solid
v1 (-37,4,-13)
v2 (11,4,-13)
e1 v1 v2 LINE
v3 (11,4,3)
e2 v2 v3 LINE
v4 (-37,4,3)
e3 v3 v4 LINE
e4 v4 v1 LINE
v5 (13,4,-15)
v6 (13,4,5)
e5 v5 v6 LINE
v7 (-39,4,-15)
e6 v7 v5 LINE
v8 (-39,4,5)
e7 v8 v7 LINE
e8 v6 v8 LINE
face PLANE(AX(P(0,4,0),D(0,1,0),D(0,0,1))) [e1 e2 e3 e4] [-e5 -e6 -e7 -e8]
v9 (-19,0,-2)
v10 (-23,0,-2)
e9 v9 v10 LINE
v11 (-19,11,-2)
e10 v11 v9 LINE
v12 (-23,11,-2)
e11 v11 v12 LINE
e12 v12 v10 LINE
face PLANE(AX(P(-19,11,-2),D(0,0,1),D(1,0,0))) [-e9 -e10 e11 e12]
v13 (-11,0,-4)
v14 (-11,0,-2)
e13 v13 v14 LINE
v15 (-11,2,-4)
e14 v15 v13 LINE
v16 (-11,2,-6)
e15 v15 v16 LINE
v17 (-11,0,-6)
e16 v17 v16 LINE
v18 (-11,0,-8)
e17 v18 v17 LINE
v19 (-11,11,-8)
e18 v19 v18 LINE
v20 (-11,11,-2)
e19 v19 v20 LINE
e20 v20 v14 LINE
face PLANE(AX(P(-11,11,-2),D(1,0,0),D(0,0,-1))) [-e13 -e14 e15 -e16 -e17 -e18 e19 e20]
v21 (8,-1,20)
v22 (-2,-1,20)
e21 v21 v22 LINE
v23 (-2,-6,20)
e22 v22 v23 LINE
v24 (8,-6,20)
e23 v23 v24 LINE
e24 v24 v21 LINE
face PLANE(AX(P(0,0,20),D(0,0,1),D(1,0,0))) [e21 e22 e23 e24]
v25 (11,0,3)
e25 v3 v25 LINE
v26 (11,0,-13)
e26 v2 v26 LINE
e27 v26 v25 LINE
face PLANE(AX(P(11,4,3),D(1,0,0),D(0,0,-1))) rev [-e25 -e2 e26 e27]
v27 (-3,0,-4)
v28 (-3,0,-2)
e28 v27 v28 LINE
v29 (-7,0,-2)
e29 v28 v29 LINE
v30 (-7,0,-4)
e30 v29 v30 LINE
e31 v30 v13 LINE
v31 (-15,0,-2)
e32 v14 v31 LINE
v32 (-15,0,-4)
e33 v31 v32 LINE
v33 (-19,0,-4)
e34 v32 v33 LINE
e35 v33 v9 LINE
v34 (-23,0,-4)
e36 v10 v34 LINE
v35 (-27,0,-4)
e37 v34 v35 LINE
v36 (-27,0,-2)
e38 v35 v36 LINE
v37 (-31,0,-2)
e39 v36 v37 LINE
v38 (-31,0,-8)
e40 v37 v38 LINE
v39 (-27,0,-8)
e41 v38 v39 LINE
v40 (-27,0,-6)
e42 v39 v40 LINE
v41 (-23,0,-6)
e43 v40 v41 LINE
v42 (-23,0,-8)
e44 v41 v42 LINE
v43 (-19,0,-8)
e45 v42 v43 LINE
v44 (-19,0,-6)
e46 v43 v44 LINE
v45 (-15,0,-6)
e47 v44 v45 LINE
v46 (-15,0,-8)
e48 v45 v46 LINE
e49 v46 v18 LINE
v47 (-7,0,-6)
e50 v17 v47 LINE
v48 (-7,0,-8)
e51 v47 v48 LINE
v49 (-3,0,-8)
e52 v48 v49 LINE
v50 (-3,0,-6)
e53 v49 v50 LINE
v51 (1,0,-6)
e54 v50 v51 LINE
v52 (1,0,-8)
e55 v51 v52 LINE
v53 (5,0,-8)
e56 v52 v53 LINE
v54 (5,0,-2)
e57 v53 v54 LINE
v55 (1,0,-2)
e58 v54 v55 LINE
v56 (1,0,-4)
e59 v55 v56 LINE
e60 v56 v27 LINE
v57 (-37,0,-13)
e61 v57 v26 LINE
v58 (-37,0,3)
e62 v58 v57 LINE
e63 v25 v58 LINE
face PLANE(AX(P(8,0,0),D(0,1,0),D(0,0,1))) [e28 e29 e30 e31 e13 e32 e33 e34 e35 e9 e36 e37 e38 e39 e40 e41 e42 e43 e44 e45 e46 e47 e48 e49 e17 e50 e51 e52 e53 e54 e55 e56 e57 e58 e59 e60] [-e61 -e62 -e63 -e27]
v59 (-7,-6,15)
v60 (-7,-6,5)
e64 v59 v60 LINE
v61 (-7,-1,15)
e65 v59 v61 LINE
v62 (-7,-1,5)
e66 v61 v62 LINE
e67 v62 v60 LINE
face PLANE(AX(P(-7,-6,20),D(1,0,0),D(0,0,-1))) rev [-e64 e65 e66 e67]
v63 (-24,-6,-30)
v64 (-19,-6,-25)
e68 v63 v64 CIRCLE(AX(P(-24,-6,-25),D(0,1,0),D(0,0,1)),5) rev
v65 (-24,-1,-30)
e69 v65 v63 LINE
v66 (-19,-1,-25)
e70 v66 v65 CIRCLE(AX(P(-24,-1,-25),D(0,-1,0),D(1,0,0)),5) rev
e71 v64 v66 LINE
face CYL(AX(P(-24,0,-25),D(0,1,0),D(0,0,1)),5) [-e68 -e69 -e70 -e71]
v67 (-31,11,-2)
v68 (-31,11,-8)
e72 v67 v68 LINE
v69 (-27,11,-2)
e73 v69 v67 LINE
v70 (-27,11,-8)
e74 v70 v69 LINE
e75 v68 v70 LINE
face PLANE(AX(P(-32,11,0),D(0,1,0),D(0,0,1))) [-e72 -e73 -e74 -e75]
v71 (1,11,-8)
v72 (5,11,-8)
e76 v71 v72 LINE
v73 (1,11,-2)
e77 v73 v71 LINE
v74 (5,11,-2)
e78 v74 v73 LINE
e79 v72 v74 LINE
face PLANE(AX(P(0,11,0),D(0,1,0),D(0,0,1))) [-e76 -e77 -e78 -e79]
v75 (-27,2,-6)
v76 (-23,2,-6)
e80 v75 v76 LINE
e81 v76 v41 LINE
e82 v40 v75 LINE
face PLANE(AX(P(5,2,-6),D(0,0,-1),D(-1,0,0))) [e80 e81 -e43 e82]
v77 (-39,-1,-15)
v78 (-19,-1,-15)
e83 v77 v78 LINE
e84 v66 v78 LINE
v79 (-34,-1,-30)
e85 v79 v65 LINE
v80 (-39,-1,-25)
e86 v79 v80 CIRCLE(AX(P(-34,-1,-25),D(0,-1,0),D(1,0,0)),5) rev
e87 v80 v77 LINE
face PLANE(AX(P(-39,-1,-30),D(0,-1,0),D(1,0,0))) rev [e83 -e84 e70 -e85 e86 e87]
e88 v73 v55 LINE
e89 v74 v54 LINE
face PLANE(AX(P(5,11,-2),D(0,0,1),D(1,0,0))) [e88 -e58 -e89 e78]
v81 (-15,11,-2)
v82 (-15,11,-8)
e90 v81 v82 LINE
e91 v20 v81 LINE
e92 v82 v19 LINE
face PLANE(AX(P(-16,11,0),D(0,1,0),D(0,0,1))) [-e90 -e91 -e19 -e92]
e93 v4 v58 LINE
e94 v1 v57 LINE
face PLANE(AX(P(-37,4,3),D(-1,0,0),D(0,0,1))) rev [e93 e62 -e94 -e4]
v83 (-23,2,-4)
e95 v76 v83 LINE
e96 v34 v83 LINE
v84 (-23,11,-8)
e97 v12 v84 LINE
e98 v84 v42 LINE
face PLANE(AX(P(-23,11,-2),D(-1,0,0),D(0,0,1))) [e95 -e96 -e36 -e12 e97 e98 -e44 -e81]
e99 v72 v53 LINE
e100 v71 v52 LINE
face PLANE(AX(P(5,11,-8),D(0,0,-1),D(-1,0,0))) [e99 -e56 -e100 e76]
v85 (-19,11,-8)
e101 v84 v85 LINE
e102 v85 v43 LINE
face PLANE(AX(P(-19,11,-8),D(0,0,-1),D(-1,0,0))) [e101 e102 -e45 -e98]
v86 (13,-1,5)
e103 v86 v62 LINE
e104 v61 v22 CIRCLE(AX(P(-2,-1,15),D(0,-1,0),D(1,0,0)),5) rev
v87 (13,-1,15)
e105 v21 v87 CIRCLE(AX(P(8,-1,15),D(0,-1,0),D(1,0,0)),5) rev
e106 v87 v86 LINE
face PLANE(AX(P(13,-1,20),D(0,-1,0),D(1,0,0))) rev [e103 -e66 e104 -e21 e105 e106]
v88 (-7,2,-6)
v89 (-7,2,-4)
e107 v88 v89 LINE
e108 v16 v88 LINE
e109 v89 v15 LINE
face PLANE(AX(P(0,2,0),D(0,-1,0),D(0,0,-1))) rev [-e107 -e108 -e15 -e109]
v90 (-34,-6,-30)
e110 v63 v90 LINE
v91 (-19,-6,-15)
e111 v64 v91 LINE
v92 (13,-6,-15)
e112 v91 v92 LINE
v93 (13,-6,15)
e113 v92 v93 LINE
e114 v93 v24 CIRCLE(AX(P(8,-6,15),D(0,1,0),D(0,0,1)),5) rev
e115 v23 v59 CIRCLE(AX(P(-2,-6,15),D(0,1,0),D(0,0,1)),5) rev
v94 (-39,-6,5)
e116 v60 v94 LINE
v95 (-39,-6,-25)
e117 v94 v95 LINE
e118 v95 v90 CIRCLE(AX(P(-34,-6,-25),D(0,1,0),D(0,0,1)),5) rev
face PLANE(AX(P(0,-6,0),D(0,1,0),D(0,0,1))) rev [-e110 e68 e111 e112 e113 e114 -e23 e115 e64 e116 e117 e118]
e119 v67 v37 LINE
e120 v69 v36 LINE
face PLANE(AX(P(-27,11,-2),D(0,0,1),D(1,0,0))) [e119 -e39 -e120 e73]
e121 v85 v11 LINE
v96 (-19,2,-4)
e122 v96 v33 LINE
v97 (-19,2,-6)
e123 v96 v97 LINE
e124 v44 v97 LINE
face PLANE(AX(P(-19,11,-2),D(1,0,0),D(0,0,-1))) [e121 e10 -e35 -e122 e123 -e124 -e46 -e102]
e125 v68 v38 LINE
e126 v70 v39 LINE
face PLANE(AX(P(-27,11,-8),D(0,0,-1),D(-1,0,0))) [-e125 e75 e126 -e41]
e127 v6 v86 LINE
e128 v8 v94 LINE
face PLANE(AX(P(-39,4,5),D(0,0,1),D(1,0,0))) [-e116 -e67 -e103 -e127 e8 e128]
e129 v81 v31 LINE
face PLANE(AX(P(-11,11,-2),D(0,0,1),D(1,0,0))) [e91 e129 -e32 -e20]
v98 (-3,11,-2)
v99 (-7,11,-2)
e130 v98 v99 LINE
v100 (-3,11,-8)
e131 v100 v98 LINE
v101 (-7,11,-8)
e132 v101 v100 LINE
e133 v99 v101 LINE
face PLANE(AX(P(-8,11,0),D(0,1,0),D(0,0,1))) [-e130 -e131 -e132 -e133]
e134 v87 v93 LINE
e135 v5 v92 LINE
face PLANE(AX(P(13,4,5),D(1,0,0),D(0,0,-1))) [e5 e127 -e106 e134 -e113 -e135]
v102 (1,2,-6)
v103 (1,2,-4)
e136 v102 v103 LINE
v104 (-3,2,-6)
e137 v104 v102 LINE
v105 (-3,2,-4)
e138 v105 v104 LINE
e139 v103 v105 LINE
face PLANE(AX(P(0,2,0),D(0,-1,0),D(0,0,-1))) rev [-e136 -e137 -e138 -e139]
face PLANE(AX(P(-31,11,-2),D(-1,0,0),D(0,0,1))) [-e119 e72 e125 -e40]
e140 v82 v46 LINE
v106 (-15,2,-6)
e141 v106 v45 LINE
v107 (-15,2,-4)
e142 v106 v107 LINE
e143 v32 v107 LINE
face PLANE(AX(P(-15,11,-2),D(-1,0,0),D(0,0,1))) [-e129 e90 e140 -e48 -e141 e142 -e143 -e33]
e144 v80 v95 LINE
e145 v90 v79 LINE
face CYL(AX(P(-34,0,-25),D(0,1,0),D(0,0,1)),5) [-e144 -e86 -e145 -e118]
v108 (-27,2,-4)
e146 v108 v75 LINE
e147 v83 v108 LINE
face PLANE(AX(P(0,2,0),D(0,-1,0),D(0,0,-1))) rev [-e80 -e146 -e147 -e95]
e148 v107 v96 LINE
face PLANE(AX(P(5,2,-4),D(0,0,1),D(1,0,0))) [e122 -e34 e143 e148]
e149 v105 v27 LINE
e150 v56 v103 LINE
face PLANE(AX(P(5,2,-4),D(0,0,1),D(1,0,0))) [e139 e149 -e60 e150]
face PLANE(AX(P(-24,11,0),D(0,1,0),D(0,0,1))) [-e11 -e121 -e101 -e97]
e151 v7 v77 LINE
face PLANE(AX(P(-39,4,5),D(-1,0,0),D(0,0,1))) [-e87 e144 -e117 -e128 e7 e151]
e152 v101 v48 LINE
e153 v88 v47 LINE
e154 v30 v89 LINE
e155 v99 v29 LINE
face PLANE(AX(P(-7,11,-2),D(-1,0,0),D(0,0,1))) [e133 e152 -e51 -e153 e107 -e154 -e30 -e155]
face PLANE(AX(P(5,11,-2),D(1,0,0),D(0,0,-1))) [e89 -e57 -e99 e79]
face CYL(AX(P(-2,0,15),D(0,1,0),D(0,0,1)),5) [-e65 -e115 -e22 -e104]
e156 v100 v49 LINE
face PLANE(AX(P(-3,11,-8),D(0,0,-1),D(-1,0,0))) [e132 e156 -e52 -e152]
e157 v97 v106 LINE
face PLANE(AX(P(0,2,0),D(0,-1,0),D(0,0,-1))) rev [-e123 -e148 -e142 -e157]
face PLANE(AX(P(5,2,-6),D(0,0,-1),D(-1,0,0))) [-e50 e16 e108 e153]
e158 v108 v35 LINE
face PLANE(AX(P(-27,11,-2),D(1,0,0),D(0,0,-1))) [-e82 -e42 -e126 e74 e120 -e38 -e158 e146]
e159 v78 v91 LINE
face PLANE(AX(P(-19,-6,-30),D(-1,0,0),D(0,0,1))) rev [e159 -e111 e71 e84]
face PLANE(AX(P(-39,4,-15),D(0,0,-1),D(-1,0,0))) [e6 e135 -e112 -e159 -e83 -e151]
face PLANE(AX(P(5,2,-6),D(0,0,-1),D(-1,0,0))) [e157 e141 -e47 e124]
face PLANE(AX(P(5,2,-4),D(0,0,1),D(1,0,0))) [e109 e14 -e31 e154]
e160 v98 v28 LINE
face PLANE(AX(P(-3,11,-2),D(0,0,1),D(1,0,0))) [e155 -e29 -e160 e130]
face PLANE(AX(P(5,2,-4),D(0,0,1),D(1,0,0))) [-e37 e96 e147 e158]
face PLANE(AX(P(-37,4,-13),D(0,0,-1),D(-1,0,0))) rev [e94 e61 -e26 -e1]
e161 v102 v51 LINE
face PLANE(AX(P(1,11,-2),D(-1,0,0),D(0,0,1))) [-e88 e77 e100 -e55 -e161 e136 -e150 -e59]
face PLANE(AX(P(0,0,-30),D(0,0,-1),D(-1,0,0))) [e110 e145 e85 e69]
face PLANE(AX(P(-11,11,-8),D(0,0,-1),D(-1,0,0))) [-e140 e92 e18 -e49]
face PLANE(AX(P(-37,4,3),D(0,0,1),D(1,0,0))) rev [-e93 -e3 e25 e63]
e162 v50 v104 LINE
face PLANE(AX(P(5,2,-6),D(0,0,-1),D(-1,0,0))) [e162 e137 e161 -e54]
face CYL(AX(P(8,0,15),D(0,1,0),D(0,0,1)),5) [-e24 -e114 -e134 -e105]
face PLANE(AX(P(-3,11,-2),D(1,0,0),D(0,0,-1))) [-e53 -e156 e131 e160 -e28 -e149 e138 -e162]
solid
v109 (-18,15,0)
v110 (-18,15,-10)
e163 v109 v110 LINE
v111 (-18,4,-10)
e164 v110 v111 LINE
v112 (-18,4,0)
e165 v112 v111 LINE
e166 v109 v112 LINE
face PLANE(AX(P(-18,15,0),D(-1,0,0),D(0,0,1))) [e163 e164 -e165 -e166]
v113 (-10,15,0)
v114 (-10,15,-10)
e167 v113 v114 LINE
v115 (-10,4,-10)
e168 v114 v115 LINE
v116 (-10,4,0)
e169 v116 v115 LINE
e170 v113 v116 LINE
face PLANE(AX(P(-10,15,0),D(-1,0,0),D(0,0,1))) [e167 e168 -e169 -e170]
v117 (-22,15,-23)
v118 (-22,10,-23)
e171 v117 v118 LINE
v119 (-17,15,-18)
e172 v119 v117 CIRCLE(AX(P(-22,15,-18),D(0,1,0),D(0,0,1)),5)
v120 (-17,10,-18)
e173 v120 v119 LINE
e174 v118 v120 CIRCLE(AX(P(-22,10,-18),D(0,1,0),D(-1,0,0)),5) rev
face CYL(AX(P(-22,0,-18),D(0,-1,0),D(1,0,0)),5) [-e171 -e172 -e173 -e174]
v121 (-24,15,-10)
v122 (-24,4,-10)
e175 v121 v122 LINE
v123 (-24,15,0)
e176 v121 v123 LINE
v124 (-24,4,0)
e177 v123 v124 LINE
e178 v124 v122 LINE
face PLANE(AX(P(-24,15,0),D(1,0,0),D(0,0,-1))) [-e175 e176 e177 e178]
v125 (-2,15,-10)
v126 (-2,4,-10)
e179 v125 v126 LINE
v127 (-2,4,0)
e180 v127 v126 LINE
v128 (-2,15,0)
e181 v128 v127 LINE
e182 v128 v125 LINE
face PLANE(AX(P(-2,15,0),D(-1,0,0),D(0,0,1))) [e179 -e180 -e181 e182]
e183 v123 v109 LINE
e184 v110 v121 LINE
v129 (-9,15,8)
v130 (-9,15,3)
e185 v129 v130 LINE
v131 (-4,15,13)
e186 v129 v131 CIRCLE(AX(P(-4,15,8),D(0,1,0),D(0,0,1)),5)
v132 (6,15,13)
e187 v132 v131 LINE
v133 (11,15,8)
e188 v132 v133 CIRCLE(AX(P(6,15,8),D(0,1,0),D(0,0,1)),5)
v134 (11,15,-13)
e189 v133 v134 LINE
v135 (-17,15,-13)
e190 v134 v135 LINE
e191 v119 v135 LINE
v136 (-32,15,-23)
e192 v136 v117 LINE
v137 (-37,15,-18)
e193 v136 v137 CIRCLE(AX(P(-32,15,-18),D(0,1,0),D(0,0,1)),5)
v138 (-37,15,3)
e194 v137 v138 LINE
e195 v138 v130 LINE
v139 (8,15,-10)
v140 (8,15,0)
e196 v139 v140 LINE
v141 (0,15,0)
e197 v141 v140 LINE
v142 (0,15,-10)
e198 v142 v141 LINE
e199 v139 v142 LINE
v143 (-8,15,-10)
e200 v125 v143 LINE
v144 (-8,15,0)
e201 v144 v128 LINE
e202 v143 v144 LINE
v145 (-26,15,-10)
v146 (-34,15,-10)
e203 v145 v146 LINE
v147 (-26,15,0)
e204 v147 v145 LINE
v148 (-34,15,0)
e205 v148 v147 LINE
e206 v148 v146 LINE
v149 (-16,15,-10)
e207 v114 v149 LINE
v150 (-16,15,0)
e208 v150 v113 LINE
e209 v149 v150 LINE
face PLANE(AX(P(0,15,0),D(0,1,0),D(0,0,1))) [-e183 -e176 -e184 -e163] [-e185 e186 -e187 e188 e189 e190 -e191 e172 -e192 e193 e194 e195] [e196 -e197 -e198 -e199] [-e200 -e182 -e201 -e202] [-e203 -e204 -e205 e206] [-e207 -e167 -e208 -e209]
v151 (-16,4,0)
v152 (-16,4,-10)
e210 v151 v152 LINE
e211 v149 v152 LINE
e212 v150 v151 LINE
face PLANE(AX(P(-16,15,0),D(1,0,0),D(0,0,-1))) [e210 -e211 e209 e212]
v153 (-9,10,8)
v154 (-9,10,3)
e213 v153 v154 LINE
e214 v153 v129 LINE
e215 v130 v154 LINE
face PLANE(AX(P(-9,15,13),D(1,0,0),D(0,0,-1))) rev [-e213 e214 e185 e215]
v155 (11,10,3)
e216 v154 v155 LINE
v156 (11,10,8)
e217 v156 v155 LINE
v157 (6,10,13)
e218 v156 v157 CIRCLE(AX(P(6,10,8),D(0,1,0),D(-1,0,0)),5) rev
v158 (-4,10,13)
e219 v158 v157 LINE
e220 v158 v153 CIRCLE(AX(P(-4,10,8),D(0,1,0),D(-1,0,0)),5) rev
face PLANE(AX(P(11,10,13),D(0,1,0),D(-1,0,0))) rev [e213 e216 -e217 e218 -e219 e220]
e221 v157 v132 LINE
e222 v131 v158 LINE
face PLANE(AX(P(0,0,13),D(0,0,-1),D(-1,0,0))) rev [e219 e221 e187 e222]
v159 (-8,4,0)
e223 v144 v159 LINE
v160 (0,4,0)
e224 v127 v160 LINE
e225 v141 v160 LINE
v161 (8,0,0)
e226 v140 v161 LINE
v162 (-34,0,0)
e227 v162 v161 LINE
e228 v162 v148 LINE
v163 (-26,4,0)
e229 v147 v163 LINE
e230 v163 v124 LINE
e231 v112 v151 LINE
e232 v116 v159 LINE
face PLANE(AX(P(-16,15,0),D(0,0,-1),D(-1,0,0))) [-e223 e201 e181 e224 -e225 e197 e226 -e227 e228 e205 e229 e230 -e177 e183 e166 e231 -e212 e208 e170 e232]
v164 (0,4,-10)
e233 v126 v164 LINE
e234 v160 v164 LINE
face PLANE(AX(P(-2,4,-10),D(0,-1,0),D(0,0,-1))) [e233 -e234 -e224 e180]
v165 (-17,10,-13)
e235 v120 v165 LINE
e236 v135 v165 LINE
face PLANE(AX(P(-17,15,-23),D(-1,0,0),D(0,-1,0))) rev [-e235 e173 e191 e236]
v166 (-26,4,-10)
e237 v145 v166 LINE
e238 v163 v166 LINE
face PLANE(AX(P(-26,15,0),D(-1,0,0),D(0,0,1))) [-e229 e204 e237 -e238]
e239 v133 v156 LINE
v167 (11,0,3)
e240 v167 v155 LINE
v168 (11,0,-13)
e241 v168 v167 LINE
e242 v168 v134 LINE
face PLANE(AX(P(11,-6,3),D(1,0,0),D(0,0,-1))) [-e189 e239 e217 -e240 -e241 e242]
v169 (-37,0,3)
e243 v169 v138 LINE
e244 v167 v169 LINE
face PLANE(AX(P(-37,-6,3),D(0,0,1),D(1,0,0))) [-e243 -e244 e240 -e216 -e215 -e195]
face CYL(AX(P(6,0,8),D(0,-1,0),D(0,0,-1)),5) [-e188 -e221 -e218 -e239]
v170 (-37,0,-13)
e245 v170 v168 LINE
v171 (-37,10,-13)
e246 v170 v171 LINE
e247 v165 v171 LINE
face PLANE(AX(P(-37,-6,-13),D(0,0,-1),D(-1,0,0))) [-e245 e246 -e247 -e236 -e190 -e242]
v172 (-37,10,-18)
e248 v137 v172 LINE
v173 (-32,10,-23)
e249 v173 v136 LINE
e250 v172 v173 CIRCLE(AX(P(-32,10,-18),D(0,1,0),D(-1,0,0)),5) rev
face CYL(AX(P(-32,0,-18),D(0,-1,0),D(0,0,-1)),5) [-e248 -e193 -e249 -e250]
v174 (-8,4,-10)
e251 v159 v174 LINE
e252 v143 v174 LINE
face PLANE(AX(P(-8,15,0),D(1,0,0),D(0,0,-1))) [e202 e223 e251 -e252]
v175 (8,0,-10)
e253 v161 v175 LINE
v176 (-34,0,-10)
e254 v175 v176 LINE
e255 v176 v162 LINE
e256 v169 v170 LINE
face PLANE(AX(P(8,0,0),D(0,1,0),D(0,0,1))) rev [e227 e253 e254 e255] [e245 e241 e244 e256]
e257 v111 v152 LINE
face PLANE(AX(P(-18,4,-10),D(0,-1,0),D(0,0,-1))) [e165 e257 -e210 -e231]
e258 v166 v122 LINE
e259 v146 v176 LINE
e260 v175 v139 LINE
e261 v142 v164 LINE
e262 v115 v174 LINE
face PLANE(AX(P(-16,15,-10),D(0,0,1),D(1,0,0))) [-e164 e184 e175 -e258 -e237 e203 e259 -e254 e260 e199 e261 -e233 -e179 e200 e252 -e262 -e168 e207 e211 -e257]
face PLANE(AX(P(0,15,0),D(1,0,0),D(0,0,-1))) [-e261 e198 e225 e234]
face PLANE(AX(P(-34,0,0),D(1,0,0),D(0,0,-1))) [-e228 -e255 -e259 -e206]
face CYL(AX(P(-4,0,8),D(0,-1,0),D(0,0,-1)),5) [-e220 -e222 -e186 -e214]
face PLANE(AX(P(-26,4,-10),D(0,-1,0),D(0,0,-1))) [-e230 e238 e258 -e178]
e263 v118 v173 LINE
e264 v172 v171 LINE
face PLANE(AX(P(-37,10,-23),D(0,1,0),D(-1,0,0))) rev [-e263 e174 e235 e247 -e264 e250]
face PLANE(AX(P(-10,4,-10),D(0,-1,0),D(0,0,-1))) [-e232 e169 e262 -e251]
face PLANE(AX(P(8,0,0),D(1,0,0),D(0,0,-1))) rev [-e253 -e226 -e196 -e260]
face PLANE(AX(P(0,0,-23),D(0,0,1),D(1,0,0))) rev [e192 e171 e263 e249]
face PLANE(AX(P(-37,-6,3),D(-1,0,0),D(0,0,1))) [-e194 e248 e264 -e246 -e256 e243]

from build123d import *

# Parameters (mm, degrees)
SKETCH1_W                = 6
SKETCH1_H                = 10
BOSS_EXTRUDE1_DEPTH      = 15
SKETCH2_W                = 4
SKETCH2_H                = 6
CUT_EXTRUDE1_DEPTH       = 11
SKETCH3_W                = 10
SKETCH3_H                = 4
BOSS_EXTRUDE2_DEPTH      = 2
LPATTERN1_COUNT          = 5
LPATTERN1_PITCH          = 8
SKETCH4_W                = 10
SKETCH4_H                = 11
BOSS_EXTRUDE3_DEPTH      = 2
SKETCH5_W                = 10
SKETCH5_H                = 15
BOSS_EXTRUDE4_DEPTH      = 2
SKETCH6_W                = 36
SKETCH6_H                = 2
CUT_EXTRUDE2_DEPTH       = 2
BOSS_EXTRUDE7_DEPTH      = 15
BOSS_EXTRUDE7_DEPTH_BACK = 6
SKETCH9_W                = 48
SKETCH9_H                = 16
SPLIT1_START             = -6
SPLIT1_OUTLINE_W         = 48
SPLIT1_OUTLINE_H         = 16
SPLIT1_DEPTH             = 6
SPLIT1_2_OUTLINE_W       = 4
SPLIT1_2_OUTLINE_H       = 6
SPLIT1_2_DEPTH           = 11
SPLIT1_3_OUTLINE_W       = 4
SPLIT1_3_OUTLINE_H       = 2
SPLIT1_3_DEPTH           = 2
SPLIT1_START_2           = -13
SPLIT1_4_OUTLINE_W       = 48
SPLIT1_4_OUTLINE_H       = 6
SPLIT1_4_DEPTH           = 16
SPLIT1_START_3           = -8
SPLIT1_5_OUTLINE_W       = 4
SPLIT1_5_OUTLINE_H       = 11
SPLIT1_5_DEPTH           = 6
SPLIT1_6_OUTLINE_W       = 4
SPLIT1_6_OUTLINE_H       = 2
SPLIT1_6_DEPTH           = 2
SKETCH11_W               = 20
SKETCH11_H               = 5
BOSS_EXTRUDE8_DEPTH      = 10
SKETCH12_W               = 20
SKETCH12_H               = 5
BOSS_EXTRUDE9_DEPTH      = 10
FILLET1_R                = 5
SKETCH13_W               = 52
SKETCH13_H               = 20
SKETCH13_W_2             = 48
SKETCH13_H_2             = 16
BOSS_EXTRUDE11_DEPTH     = 10
SKETCH14_W               = 20
SKETCH14_H               = 5
BOSS_EXTRUDE12_DEPTH     = 15
SKETCH15_W               = 20
SKETCH15_H               = 5
BOSS_EXTRUDE13_DEPTH     = 15
FILLET2_R                = 5


# Read off the part's stored shape, not the designer's step: Split1
with BuildPart() as part:
    # Sketch1 → Boss-Extrude1 (new body)
    with BuildSketch(Plane(origin=(0, 0, 0), x_dir=(1, 0, 0), z_dir=(0, 1, 0))):
        with Locations((3, 5)):
            Rectangle(SKETCH1_W, SKETCH1_H)
    extrude(amount=BOSS_EXTRUDE1_DEPTH)

    # Sketch2 → Cut-Extrude1 (cut)
    with BuildSketch(Plane.XZ):
        with Locations((3, -5)):
            Rectangle(SKETCH2_W, SKETCH2_H)
    extrude(amount=-CUT_EXTRUDE1_DEPTH, mode=Mode.SUBTRACT)

    # Sketch3 → Boss-Extrude2 (add)
    with BuildSketch(Plane.ZY):
        with Locations((-5, 2)):
            Rectangle(SKETCH3_W, SKETCH3_H)
    extrude(amount=BOSS_EXTRUDE2_DEPTH)


with BuildPart() as lpattern1_1:
    # LPattern1: pattern copy
    add(part.part.moved(Location(Vector(-1, 0, 0) * (1 * LPATTERN1_PITCH))))


with BuildPart() as lpattern1_2:
    # LPattern1: pattern copy
    add(part.part.moved(Location(Vector(-1, 0, 0) * (2 * LPATTERN1_PITCH))))


with BuildPart() as lpattern1_3:
    # LPattern1: pattern copy
    add(part.part.moved(Location(Vector(-1, 0, 0) * (3 * LPATTERN1_PITCH))))


with BuildPart() as lpattern1_4:
    # LPattern1: pattern copy
    add(part.part.moved(Location(Vector(-1, 0, 0) * (4 * LPATTERN1_PITCH))))


with BuildPart() as lpattern1_2_1:
    add(lpattern1_2.part)

    # Combine1: union LPattern1_1, part, LPattern1_3, LPattern1_4
    add(lpattern1_1.part)
    add(part.part)
    add(lpattern1_3.part)
    add(lpattern1_4.part)

    # Sketch4 → Boss-Extrude3 (add)
    with BuildSketch(Plane.ZY.offset(32)):
        with Locations((-5, 9.5)):
            Rectangle(SKETCH4_W, SKETCH4_H)
    extrude(amount=BOSS_EXTRUDE3_DEPTH)

    # Sketch5 → Boss-Extrude4 (add)
    with BuildSketch(Plane(origin=(6, 0, 0), x_dir=(0, 0, -1), z_dir=(1, 0, 0))):
        with Locations((5, 7.5)):
            Rectangle(SKETCH5_W, SKETCH5_H)
    extrude(amount=BOSS_EXTRUDE4_DEPTH)

    # Sketch6 → Cut-Extrude2 (cut)
    with BuildSketch(Plane(origin=(0, 0, 0), x_dir=(-1, 0, 0), z_dir=(0, -1, 0))):
        with Locations((13, 5)):
            Rectangle(SKETCH6_W, SKETCH6_H)
    extrude(amount=-CUT_EXTRUDE2_DEPTH, mode=Mode.SUBTRACT)


with BuildPart() as body_2:
    # Sketch9 → Boss-Extrude7 (new, two sides: drawn at the far end of the back side and taken through both)
    with BuildSketch(Plane(origin=(0, 0, 0), x_dir=(1, 0, 0), z_dir=(0, 1, 0)).offset(-BOSS_EXTRUDE7_DEPTH_BACK)):
        with Locations((-13, 5)):
            Rectangle(SKETCH9_W, SKETCH9_H)
    extrude(amount=BOSS_EXTRUDE7_DEPTH + BOSS_EXTRUDE7_DEPTH_BACK)

    # Combine2: cut LPattern1_2
    add(lpattern1_2_1.part, mode=Mode.SUBTRACT)

    # Split1 outline → Split1 (cut)
    with BuildSketch(Plane(origin=(0, 0, 0), x_dir=(1, 0, 0), z_dir=(0, 1, 0)).offset(SPLIT1_START)):
        with Locations((-13, 5)):
            Rectangle(SPLIT1_OUTLINE_W, SPLIT1_OUTLINE_H)
    extrude(amount=SPLIT1_DEPTH, mode=Mode.SUBTRACT)

    # Split1 2 outline → Split1 2 (cut)
    with BuildSketch(Plane(origin=(0, 0, 0), x_dir=(1, 0, 0), z_dir=(0, 1, 0))):
        with Locations((-13, 5)):
            Rectangle(SPLIT1_2_OUTLINE_W, SPLIT1_2_OUTLINE_H)
        with Locations((-5, 5)):
            Rectangle(SPLIT1_2_OUTLINE_W, SPLIT1_2_OUTLINE_H)
        with Locations((-21, 5)):
            Rectangle(SPLIT1_2_OUTLINE_W, SPLIT1_2_OUTLINE_H)
        with Locations((3, 5)):
            Rectangle(SPLIT1_2_OUTLINE_W, SPLIT1_2_OUTLINE_H)
        with Locations((-29, 5)):
            Rectangle(SPLIT1_2_OUTLINE_W, SPLIT1_2_OUTLINE_H)
    extrude(amount=SPLIT1_2_DEPTH, mode=Mode.SUBTRACT)

    # Split1 3 outline → Split1 3 (cut)
    with BuildSketch(Plane(origin=(0, 0, 0), x_dir=(1, 0, 0), z_dir=(0, 1, 0))):
        with Locations((-9, 5)):
            Rectangle(SPLIT1_3_OUTLINE_W, SPLIT1_3_OUTLINE_H)
        with Locations((-17, 5)):
            Rectangle(SPLIT1_3_OUTLINE_W, SPLIT1_3_OUTLINE_H)
        with Locations((-1, 5)):
            Rectangle(SPLIT1_3_OUTLINE_W, SPLIT1_3_OUTLINE_H)
        with Locations((-25, 5)):
            Rectangle(SPLIT1_3_OUTLINE_W, SPLIT1_3_OUTLINE_H)
    extrude(amount=SPLIT1_3_DEPTH, mode=Mode.SUBTRACT)

    # Sketch11 → Boss-Extrude8 (add)
    with BuildSketch(Plane.XY.offset(3)):
        with Locations((1, 12.5)):
            Rectangle(SKETCH11_W, SKETCH11_H)
    extrude(amount=BOSS_EXTRUDE8_DEPTH)

    # Sketch12 → Boss-Extrude9 (add)
    with BuildSketch(Plane(origin=(0, 0, -13), x_dir=(-1, 0, 0), z_dir=(0, 0, -1))):
        with Locations((27, 12.5)):
            Rectangle(SKETCH12_W, SKETCH12_H)
    extrude(amount=BOSS_EXTRUDE9_DEPTH)

    # Fillet1
    fillet1_edges = [body_2.edges().sort_by_distance(p)[0] for p in [
        (11, 12.5, 13),
        (-9, 12.5, 13),
        (-37, 12.5, -23),
        (-17, 12.5, -23),
    ]]
    fillet(fillet1_edges, radius=FILLET1_R)


with BuildPart() as body_2_2:
    # Split1 4 outline → Split1 4 (new body)
    with BuildSketch(Plane.XY.offset(SPLIT1_START_2)):
        with Locations((-13, -3)):
            Rectangle(SPLIT1_4_OUTLINE_W, SPLIT1_4_OUTLINE_H)
    extrude(amount=SPLIT1_4_DEPTH)

    # Split1 5 outline → Split1 5 (add)
    with BuildSketch(Plane.XY.offset(SPLIT1_START_3)):
        with Locations((-29, 5.5)):
            Rectangle(SPLIT1_5_OUTLINE_W, SPLIT1_5_OUTLINE_H)
        with Locations((-21, 5.5)):
            Rectangle(SPLIT1_5_OUTLINE_W, SPLIT1_5_OUTLINE_H)
        with Locations((-13, 5.5)):
            Rectangle(SPLIT1_5_OUTLINE_W, SPLIT1_5_OUTLINE_H)
        with Locations((3, 5.5)):
            Rectangle(SPLIT1_5_OUTLINE_W, SPLIT1_5_OUTLINE_H)
        with Locations((-5, 5.5)):
            Rectangle(SPLIT1_5_OUTLINE_W, SPLIT1_5_OUTLINE_H)
    extrude(amount=SPLIT1_5_DEPTH)

    # Split1 6 outline → Split1 6 (add)
    with BuildSketch(Plane.XY.offset(SPLIT1_START)):
        with Locations((-25, 1)):
            Rectangle(SPLIT1_6_OUTLINE_W, SPLIT1_6_OUTLINE_H)
        with Locations((-17, 1)):
            Rectangle(SPLIT1_6_OUTLINE_W, SPLIT1_6_OUTLINE_H)
        with Locations((-9, 1)):
            Rectangle(SPLIT1_6_OUTLINE_W, SPLIT1_6_OUTLINE_H)
        with Locations((-1, 1)):
            Rectangle(SPLIT1_6_OUTLINE_W, SPLIT1_6_OUTLINE_H)
    extrude(amount=SPLIT1_6_DEPTH)

    # Sketch13 → Boss-Extrude11 (add)
    with BuildSketch(Plane.XZ.offset(6)):
        with Locations((-13, -5)):
            Rectangle(SKETCH13_W, SKETCH13_H)
        with Locations((-13, -5)):
            Rectangle(SKETCH13_W_2, SKETCH13_H_2, mode=Mode.SUBTRACT)
    extrude(amount=-BOSS_EXTRUDE11_DEPTH)

    # Sketch14 → Boss-Extrude12 (add)
    with BuildSketch(Plane.XY.offset(5)):
        with Locations((3, -3.5)):
            Rectangle(SKETCH14_W, SKETCH14_H)
    extrude(amount=BOSS_EXTRUDE12_DEPTH)

    # Sketch15 → Boss-Extrude13 (add)
    with BuildSketch(Plane(origin=(0, 0, -15), x_dir=(-1, 0, 0), z_dir=(0, 0, -1))):
        with Locations((29, -3.5)):
            Rectangle(SKETCH15_W, SKETCH15_H)
    extrude(amount=BOSS_EXTRUDE13_DEPTH)

    # Fillet2
    fillet2_edges = [body_2_2.edges().sort_by_distance(p)[0] for p in [
        (13, -3.5, 20),
        (-7, -3.5, 20),
        (-39, -3.5, -30),
        (-19, -3.5, -30),
    ]]
    fillet(fillet2_edges, radius=FILLET2_R)


solid = Compound([body_2.part, body_2_2.part])
